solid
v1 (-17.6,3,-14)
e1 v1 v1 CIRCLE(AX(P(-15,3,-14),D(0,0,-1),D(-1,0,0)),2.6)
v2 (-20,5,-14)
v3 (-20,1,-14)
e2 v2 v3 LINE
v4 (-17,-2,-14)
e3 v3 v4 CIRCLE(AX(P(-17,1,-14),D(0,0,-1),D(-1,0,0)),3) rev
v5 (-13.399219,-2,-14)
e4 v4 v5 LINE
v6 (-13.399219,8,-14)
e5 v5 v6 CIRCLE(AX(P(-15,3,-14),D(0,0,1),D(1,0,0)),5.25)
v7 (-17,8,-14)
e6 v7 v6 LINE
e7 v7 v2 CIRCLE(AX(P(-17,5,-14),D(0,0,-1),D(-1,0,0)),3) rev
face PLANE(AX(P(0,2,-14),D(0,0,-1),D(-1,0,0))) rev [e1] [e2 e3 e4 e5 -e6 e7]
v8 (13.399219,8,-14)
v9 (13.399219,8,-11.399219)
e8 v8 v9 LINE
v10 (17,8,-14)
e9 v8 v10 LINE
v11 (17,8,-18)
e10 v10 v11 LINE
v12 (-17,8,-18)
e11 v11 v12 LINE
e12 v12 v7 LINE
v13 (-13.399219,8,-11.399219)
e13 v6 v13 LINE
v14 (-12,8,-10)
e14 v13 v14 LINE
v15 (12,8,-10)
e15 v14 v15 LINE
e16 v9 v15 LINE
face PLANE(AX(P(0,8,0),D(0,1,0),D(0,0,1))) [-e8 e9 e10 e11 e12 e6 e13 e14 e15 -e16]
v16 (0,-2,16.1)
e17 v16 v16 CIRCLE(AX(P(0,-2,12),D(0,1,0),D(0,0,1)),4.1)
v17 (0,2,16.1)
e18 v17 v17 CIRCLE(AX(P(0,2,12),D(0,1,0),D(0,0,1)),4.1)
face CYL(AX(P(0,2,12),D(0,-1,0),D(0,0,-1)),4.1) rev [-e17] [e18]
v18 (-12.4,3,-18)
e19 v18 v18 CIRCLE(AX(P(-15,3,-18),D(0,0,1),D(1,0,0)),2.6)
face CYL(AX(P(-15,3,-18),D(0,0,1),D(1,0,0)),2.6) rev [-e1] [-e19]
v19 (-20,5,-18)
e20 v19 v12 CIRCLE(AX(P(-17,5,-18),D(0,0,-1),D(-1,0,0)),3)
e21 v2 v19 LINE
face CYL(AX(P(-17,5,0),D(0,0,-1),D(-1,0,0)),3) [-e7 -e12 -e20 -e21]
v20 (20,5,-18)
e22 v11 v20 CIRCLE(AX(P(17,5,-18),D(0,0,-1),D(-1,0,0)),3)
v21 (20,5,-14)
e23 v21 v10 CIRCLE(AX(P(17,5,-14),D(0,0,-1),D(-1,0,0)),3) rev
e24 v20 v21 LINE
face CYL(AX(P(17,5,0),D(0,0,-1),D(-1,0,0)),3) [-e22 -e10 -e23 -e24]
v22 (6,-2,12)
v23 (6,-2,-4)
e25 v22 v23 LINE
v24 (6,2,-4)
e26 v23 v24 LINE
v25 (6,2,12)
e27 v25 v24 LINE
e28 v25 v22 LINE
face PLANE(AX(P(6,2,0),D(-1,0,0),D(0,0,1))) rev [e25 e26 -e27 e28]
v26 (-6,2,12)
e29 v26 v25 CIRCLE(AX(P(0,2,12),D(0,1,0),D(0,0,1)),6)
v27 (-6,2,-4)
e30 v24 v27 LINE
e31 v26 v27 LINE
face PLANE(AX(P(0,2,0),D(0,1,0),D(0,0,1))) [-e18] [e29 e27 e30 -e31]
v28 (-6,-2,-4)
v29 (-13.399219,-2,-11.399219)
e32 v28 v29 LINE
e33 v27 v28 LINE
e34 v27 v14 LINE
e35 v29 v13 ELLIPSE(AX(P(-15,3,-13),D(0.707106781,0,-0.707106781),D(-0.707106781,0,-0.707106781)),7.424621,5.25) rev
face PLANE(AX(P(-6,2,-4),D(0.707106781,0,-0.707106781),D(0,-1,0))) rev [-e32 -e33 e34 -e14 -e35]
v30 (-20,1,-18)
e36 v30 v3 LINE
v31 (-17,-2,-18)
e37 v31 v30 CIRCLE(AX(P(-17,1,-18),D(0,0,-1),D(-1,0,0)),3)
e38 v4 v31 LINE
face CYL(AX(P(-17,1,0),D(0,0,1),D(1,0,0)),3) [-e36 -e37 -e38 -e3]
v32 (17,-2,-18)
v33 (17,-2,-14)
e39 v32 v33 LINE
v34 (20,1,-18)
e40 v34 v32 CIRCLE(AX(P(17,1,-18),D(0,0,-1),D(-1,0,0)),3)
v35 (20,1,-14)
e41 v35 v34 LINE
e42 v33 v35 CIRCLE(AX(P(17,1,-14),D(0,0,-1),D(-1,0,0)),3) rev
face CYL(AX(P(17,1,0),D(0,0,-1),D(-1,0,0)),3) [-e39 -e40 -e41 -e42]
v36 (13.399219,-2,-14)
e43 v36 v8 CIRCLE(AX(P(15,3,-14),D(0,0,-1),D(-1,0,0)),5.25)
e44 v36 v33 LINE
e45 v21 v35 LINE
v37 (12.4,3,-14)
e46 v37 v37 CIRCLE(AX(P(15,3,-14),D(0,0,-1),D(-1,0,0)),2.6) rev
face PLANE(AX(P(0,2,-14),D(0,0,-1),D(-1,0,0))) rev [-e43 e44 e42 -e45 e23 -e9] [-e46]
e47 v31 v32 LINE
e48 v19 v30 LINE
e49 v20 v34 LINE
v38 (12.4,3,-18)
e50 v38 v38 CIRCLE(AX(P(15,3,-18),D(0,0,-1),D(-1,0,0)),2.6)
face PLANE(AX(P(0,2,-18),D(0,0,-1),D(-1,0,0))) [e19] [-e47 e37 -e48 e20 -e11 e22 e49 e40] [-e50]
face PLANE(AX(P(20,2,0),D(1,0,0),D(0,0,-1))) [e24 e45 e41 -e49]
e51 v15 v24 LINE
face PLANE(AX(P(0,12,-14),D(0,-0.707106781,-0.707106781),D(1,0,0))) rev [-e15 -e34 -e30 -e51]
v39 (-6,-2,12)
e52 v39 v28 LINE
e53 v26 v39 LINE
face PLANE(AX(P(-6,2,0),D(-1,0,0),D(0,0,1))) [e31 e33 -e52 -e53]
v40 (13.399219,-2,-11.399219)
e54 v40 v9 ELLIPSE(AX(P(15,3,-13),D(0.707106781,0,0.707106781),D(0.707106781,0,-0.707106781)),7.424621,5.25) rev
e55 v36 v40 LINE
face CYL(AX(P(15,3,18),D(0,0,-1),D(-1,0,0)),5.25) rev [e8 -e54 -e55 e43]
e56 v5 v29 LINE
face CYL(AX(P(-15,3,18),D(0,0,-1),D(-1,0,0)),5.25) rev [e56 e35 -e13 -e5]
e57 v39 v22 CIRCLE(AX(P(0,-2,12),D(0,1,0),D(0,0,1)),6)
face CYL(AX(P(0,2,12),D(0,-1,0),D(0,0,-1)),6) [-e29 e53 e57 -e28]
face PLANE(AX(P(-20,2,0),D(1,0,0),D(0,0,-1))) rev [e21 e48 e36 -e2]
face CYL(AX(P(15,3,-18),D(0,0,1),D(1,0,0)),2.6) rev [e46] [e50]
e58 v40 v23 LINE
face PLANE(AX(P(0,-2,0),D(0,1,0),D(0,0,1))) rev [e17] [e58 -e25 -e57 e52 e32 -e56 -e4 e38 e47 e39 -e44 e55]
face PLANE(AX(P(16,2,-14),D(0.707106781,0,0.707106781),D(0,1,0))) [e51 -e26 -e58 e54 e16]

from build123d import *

# Parameters (mm, degrees)
ESBO_O1_R                = 6
ESBO_O1_R_2              = 4.1
RESSALTO_EXTRUS_O1_DEPTH = 2
ESBO_O2_W                = 40
ESBO_O2_H                = 4
RESSALTO_EXTRUS_O2_DEPTH = 6
CHANFRO3_SIZE            = 10
CHANFRO4_SIZE            = 10
CHANFRO5_SIZE            = 10
ESBO_O6_R                = 2.6
CORTE_EXTRUS_O2_DEPTH    = 39.574603044
ESBO_O7_R                = 5.25
CORTE_EXTRUS_O6_DEPTH    = 39.574603044
FILETE1_R                = 3


with BuildPart() as part:
    # Esboço1 → Ressalto-extrusão1 (new, symmetric)
    # profile 1 of 3: a face of its own
    with BuildSketch(Plane(origin=(0, 0, 0), x_dir=(1, 0, 0), z_dir=(0, 1, 0))):
        Polygon((20, 18), (-20, 18), (-20, 14), (-6, 14), (6, 14), (20, 14), align=None)
    # profile 2 of 3: a face of its own
    with BuildSketch(Plane(origin=(0, 0, 0), x_dir=(1, 0, 0), z_dir=(0, 1, 0))):
        with BuildLine():
            Line((6, 14), (-6, 14))
            Line((-6, 14), (-6, -12))
            ThreePointArc((-6, -12), (0, -6), (6, -12))
            Line((6, -12), (6, 14))
        make_face()
    # profile 3 of 3: a face of its own
    with BuildSketch(Plane(origin=(0, 0, 0), x_dir=(1, 0, 0), z_dir=(0, 1, 0))):
        with Locations((0, -12)):
            Circle(ESBO_O1_R)
        with Locations(Location((0, -12, 0), (0, 0, 270))):
            Circle(ESBO_O1_R_2, mode=Mode.SUBTRACT)
    extrude(amount=RESSALTO_EXTRUS_O1_DEPTH, both=True)

    # Esboço2 → Ressalto-extrusão2 (add)
    with BuildSketch(Plane(origin=(0, 2, 0), x_dir=(1, 0, 0), z_dir=(0, 1, 0))):
        with Locations((0, 16)):
            Rectangle(ESBO_O2_W, ESBO_O2_H)
    extrude(amount=RESSALTO_EXTRUS_O2_DEPTH)

    # Chanfro3
    chanfro3_edges = [part.edges().sort_by_distance(p)[0] for p in [
        (6, 0, -14),
    ]]
    chamfer(chanfro3_edges, length=CHANFRO3_SIZE)

    # Chanfro4
    chanfro4_edges = [part.edges().sort_by_distance(p)[0] for p in [
        (-6, 0, -14),
    ]]
    chamfer(chanfro4_edges, length=CHANFRO4_SIZE)

    # Chanfro5
    # the kernel refuses this chamfer: 10 mm, written as the material it adds along each edge
    with BuildSketch(Plane(origin=(-41.71682988, 2, -14), x_dir=(0, 0.9996219169112968, -0.027495876610586317), z_dir=(1, 0, 0))) as chanfro5_piece_1_section:
        Polygon((CHANFRO5_SIZE * 0.999621916911, CHANFRO5_SIZE * 0.0274958766106), (-CHANFRO5_SIZE * 0.0274958766106, CHANFRO5_SIZE * 0.999621916911), (0, 0), align=None)
    chanfro5_piece_1 = extrude(amount=83.433659759, mode=Mode.PRIVATE)
    chanfro5_piece_1 = split(chanfro5_piece_1, bisect_by=Plane(origin=(-11.43705518, 4.703831668, -9.43705518), z_dir=(0.7071067811865475, 0, -0.7071067811865476)), keep=Keep.TOP, mode=Mode.PRIVATE)
    chanfro5_piece_1 = split(chanfro5_piece_1, bisect_by=Plane(origin=(-9.624703453, 8, -11.249406907), z_dir=(0, -1, 0)), keep=Keep.TOP, mode=Mode.PRIVATE)
    chanfro5_piece_1 = split(chanfro5_piece_1, bisect_by=Plane(origin=(-6, 4.703831668, -11.249406907), z_dir=(-1, 0, 0)), keep=Keep.TOP, mode=Mode.PRIVATE)
    add(chanfro5_piece_1)
    with BuildSketch(Plane(origin=(-41.71682988, 2, -14), x_dir=(0, 0.9996219169112968, -0.027495876610586317), z_dir=(1, 0, 0))) as chanfro5_piece_2_section:
        Polygon((CHANFRO5_SIZE * 0.999621916911, CHANFRO5_SIZE * 0.0274958766106), (-CHANFRO5_SIZE * 0.0274958766106, CHANFRO5_SIZE * 0.999621916911), (0, 0), align=None)
    chanfro5_piece_2 = extrude(amount=83.433659759, mode=Mode.PRIVATE)
    chanfro5_piece_2 = split(chanfro5_piece_2, bisect_by=Plane(origin=(-6.125087245, 4.433681659, -4.125087245), z_dir=(0.7071067811865475, 0, -0.7071067811865476)), keep=Keep.TOP, mode=Mode.PRIVATE)
    chanfro5_piece_2 = split(chanfro5_piece_2, bisect_by=Plane(origin=(6.125087245, 4.433681659, -4.125087245), z_dir=(-0.7071067811865477, 0, -0.7071067811865474)), keep=Keep.TOP, mode=Mode.PRIVATE)
    chanfro5_piece_2 = split(chanfro5_piece_2, bisect_by=Plane(origin=(0, 8, -10.250174491), z_dir=(0, -1, 0)), keep=Keep.TOP, mode=Mode.PRIVATE)
    chanfro5_piece_2 = split(chanfro5_piece_2, bisect_by=Plane(origin=(6, 4.433681659, -10.250174491), z_dir=(-1, 0, 0)), keep=Keep.TOP, mode=Mode.PRIVATE)
    chanfro5_piece_2 = split(chanfro5_piece_2, bisect_by=Plane(origin=(-6, 4.433681659, -10.250174491), z_dir=(1, 0, 0)), keep=Keep.TOP, mode=Mode.PRIVATE)
    add(chanfro5_piece_2)
    with BuildSketch(Plane(origin=(-41.71682988, 2, -14), x_dir=(0, 0.9996219169112968, -0.027495876610586317), z_dir=(1, 0, 0))) as chanfro5_piece_3_section:
        Polygon((CHANFRO5_SIZE * 0.999621916911, CHANFRO5_SIZE * 0.0274958766106), (-CHANFRO5_SIZE * 0.0274958766106, CHANFRO5_SIZE * 0.999621916911), (0, 0), align=None)
    chanfro5_piece_3 = extrude(amount=83.433659759, mode=Mode.PRIVATE)
    chanfro5_piece_3 = split(chanfro5_piece_3, bisect_by=Plane(origin=(11.43705518, 4.703831668, -9.43705518), z_dir=(-0.7071067811865477, 0, -0.7071067811865474)), keep=Keep.TOP, mode=Mode.PRIVATE)
    chanfro5_piece_3 = split(chanfro5_piece_3, bisect_by=Plane(origin=(9.624703453, 8, -11.249406907), z_dir=(0, -1, 0)), keep=Keep.TOP, mode=Mode.PRIVATE)
    chanfro5_piece_3 = split(chanfro5_piece_3, bisect_by=Plane(origin=(6, 4.703831668, -11.249406907), z_dir=(1, 0, 0)), keep=Keep.TOP, mode=Mode.PRIVATE)
    add(chanfro5_piece_3)

    # Esboço6 → Corte-extrusão2 (cut, symmetric)
    with BuildSketch(Plane.XY.offset(-14)):
        with Locations((-15, 3)):
            Circle(ESBO_O6_R)
    corte_extrus_o2 = extrude(amount=CORTE_EXTRUS_O2_DEPTH, both=True, mode=Mode.SUBTRACT)

    # Esboço7 → Corte-extrusão6 (cut, through all)
    with BuildSketch(Plane.XY.offset(-14)):
        with Locations((-15, 3)):
            Circle(ESBO_O7_R)
    corte_extrus_o6 = extrude(amount=CORTE_EXTRUS_O6_DEPTH, mode=Mode.SUBTRACT)

    # Espelhar2: Corte-extrusão2, Corte-extrusão6 across plane
    add(corte_extrus_o2.mirror(Plane(origin=(0, 0, 0), x_dir=(0, 0, 1), z_dir=(1, 0, 0))), mode=Mode.SUBTRACT)
    add(corte_extrus_o6.mirror(Plane(origin=(0, 0, 0), x_dir=(0, 0, 1), z_dir=(1, 0, 0))), mode=Mode.SUBTRACT)

    # Filete1
    filete1_edges = [part.edges().sort_by_distance(p)[0] for p in [
        (20, -2, -16),
        (-20, -2, -16),
        (-20, 8, -16),
        (20, 8, -16),
    ]]
    fillet(filete1_edges, radius=FILETE1_R)


solid = part.part
